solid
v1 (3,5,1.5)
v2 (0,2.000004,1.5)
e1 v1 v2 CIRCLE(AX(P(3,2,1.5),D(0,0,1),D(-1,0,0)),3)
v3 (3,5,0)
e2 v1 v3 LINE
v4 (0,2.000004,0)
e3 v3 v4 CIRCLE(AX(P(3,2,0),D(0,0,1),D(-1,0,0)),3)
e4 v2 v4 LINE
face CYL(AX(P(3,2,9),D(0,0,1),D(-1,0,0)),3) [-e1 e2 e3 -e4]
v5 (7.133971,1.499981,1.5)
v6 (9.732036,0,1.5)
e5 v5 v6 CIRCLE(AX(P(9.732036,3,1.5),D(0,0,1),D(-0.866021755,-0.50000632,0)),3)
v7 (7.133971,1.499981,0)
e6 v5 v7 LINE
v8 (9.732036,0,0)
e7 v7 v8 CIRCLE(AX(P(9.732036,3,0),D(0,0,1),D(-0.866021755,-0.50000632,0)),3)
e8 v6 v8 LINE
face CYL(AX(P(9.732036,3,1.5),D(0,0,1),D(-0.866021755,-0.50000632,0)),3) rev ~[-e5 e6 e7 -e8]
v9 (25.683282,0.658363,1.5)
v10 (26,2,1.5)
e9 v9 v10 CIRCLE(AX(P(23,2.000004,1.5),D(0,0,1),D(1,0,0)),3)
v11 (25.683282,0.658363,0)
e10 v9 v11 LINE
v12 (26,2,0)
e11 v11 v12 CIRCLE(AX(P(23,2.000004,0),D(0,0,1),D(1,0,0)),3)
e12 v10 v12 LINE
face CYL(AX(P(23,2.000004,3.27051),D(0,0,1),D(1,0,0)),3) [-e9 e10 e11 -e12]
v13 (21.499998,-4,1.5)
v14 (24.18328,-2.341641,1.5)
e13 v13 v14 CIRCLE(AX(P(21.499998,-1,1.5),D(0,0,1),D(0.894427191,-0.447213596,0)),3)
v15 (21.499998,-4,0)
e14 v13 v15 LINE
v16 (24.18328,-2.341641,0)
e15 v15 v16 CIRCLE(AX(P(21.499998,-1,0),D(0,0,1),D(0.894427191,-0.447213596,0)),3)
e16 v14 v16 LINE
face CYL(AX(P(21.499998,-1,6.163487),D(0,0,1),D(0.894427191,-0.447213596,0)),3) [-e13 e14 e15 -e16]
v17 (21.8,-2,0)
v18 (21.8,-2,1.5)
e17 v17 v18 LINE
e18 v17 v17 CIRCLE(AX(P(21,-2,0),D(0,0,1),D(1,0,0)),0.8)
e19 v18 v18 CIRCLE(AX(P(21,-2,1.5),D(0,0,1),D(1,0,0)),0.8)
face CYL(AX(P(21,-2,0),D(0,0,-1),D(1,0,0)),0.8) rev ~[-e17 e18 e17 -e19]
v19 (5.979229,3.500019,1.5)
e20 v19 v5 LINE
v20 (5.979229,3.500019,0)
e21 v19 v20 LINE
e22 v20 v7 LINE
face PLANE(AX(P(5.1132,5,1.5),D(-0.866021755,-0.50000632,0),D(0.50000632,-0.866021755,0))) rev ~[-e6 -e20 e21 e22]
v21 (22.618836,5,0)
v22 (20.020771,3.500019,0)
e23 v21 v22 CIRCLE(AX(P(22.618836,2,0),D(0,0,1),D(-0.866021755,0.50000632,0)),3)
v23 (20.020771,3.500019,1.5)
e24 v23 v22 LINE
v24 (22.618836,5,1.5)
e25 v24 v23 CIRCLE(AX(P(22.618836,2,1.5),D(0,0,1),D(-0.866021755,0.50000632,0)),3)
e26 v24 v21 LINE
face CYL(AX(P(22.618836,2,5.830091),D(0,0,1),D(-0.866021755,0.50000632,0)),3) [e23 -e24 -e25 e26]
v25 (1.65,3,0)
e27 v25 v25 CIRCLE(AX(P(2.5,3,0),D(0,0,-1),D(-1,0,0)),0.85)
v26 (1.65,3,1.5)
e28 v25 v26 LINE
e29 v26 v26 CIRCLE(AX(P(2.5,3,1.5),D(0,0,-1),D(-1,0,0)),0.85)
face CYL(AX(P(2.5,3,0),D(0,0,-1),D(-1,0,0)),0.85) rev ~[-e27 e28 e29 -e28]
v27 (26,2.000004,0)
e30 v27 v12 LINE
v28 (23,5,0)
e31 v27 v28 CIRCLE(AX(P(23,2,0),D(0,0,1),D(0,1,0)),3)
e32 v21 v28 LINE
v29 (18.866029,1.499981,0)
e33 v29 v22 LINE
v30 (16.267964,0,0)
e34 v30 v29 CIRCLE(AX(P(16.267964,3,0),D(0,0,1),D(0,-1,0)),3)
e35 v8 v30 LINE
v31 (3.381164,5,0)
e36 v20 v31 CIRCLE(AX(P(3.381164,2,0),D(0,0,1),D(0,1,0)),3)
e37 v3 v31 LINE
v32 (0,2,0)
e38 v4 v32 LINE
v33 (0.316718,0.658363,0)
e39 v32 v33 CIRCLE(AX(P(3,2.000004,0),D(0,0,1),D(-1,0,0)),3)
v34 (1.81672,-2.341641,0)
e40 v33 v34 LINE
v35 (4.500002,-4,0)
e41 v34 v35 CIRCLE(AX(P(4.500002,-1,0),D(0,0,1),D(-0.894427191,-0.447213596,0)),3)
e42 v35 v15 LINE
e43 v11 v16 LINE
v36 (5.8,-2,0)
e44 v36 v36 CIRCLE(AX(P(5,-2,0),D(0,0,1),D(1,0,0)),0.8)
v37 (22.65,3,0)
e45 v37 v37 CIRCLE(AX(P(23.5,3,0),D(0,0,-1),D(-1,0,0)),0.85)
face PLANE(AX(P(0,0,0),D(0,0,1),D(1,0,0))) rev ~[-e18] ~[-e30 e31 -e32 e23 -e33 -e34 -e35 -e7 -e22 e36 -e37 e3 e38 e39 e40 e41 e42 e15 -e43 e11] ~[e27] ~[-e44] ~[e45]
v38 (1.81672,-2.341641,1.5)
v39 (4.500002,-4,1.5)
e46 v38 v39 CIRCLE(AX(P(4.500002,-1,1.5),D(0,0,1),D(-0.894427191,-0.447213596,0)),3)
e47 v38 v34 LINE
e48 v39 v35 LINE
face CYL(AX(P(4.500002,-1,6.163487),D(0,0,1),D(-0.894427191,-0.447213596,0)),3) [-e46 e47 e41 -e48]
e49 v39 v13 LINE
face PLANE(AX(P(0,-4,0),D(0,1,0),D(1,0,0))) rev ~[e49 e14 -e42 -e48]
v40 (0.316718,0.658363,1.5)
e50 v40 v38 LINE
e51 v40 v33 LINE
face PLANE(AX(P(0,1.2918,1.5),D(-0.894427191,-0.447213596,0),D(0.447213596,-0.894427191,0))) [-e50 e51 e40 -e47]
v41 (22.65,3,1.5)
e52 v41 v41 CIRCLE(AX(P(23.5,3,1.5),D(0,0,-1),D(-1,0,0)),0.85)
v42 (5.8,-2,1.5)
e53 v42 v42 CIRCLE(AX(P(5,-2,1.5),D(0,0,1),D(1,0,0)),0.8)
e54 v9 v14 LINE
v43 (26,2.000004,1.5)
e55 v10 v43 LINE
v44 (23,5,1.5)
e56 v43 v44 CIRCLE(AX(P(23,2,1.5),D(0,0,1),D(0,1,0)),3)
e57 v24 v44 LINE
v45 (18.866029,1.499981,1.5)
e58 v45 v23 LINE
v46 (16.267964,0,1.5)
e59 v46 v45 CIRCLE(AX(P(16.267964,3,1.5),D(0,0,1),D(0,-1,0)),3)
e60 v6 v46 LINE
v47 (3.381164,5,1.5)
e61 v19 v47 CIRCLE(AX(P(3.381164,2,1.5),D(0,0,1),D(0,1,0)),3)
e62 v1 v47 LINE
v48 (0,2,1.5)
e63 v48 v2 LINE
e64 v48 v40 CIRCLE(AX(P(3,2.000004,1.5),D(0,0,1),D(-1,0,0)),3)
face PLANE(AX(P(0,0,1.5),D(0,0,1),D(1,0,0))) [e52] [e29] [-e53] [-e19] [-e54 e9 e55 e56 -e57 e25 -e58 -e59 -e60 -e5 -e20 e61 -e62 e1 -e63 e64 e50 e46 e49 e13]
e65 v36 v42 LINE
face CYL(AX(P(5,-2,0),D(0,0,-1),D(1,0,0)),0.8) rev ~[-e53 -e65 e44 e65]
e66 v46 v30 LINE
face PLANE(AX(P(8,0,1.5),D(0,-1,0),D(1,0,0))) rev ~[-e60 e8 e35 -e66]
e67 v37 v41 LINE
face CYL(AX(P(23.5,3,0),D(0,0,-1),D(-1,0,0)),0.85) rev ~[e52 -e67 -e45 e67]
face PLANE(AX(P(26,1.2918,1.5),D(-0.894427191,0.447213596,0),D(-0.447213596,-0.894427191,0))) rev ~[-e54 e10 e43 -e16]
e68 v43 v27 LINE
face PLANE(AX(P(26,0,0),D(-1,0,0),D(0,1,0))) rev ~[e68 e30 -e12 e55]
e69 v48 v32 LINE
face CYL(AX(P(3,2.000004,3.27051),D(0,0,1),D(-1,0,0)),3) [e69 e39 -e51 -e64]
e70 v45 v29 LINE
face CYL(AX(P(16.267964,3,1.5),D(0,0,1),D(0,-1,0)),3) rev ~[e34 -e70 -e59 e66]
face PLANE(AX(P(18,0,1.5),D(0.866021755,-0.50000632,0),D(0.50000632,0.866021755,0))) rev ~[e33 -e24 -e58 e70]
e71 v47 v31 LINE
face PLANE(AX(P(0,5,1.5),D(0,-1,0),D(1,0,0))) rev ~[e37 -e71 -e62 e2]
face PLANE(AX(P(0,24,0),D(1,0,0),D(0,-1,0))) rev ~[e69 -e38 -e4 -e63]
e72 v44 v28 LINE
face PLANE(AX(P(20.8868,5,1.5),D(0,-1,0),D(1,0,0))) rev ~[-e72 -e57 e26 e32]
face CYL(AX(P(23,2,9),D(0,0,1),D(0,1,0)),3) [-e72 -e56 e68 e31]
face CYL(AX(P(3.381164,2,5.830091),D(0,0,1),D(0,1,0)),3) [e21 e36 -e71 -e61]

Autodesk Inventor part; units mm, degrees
ref_plane "YZ Plane" through (0, 0, 0) normal (1, 0, 0) x (0, 1, 0)
ref_plane "XZ Plane" through (0, 0, 0) normal (0, 1, 0) x (-1, 0, 0)
ref_plane "XY Plane" through (0, 0, 0) normal (0, 0, 1) x (1, 0, 0)
sketch "スケッチ2" plane through (0, 0, 0) normal (0, 0, 1) x (1, 0, 0)
  line L0 (0, 0) -> (26, 0)
  line L1 (26, 0) -> (26, 33)
  line L2 (26, 33) -> (0, 33)
  line L3 (0, 33) -> (0, 0)
  line L4 (0, 0) -> (26, 0)
  line L5 (26, 0) -> (26, 24)
  line L6 (26, 24) -> (0, 24) construction
  line L7 (0, 24) -> (0, 0)
  circle A0 centre (13, 24) radius 13
  circle A1 centre (13, 24) radius 6.25
  line L8 (26, 0) -> (0, 0)
  line L9 (0, 0) -> (0, -4)
  line L10 (0, -4) -> (26, -4)
  line L11 (26, -4) -> (26, 0)
  circle A2 centre (21, -2) radius 0.8
  circle A3 centre (5, -2) radius 0.8
  point P0 (22.3808, 33)
  point P1 (3.6192, 33)
  point P2 (26, -2)
  dimension "d0" = 26
  dimension "d1" = 33
  dimension "d2" = 24
  dimension "d3" = 12.5
  dimension "d8" = 4
  dimension "d9" = 1.6
  dimension "d10" = 1.6
  dimension "d12" = 5
  dimension "d13" = 5
extrude "押し出し1" add sketch "スケッチ2" along normal blind 1.5 contours L3 A0 L1 L0 | L0 L11 L10 L9 | A0 L2 picked at (12.7489, 32.0681)
sketch "スケッチ3" plane through (0, 0, 0) normal (0, 0, -1) x (-1, 0, 0)
  circle A0 centre (-2.5, 24) radius 0.85 projected
  circle A1 centre (-23.5, 24) radius 0.85 projected
  circle A2 centre (-23.5, 3) radius 0.85 projected
  circle A3 centre (-2.5, 3) radius 0.85 projected
  point P0 (0, 0)
extrude "押し出し2" cut sketch "スケッチ3" against normal through all
fillet "フィレット1" radius 3 4 edges at (22.3808, 33, 0.75) (3.6192, 33, 0.75) (26, -4, 0.75) (0, -4, 0.75)
sketch "スケッチ4" plane through (0, 0, 1.5) normal (0, 0, 1) x (1, 0, 0)
  line L0 (0, 24) -> (0, -1) projected
  line L1 (0, 5) -> (26, 5)
  line L2 (26, 5) -> (26, 33)
  line L3 (26, 33) -> (0, 33)
  line L4 (0, 33) -> (0, 5)
  line L5 (21, 33) -> (5, 33) projected
  line L6 (26, -1) -> (26, 24) projected
  circle A0 centre (2.5, 3) radius 0.85 projected
  line L7 (5.1132, 5) -> (8, 0)
  line L8 (8, 0) -> (18, 0)
  line L9 (18, 0) -> (20.8868, 5)
  line L10 (0, 1.2918) -> (2.6459, -4)
  line L11 (3, -4) -> (23, -4) projected
  line L12 (26, 1.2918) -> (23.3541, -4)
  arc A1 (0, -1) -> (3, -4) centre (3, -1) ccw projected
  arc A2 (23, -4) -> (26, -1) centre (23, -1) ccw projected
  line L13 (2.5, 3) -> (5, -2)
  circle A3 centre (5, -2) radius 0.8 projected
  circle A4 centre (21, -2) radius 0.8 projected
  circle A5 centre (23.5, 3) radius 0.85 projected
  line L14 (23.5, 3) -> (21, -2)
  point P0 (0, 0)
  point P1 (13, 0)
  point P2 (13, 5)
  point P3 (23.3653, -3.9777)
  point P4 (2.6347, -3.9777)
  dimension "d15" = 2
  dimension "d16" = 10
  dimension "d17" = 5
  dimension "d18" = 120
  dimension "d19" = 120
  dimension "d24" = 3
  dimension "d25" = 3
extrude "切り取り1" cut sketch "スケッチ4" against normal blind 3.048 contours L4 L3 L2 L1 L0 | L1 L9 L8 L7
extrude "押し出し3" cut sketch "スケッチ4" against normal through all contours L10 A1 L0 | L6 A2 L12
fillet "フィレット3" radius 3 10 edges at (5.1132, 5, 0.75) (0, 5, 0.75) (8, 0, 0.75) (20.8868, 5, 0.75) (26, 5, 0.75) (26, 1.2918, 0.75) (18, 0, 0.75) (0, 1.2918, 0.75) (2.6347, -3.9777, 0.75) (23.3653, -3.9777, 0.75)
equation "\"d13\" = d12"
equation "\"d19\" = d18"
equation "\"d25\" = d24"
equation "\"d21\" = Thickness"
equation "\"BendRadius\" = Thickness"
equation "\"BendReliefWidth\" = Thickness"
equation "\"BendReliefDepth\" = 0.5 * Thickness"
equation "\"CornerReliefSize\" = 4 * Thickness"
equation "\"MinimumRemnant\" = 2 * Thickness"
equation "\"TransitionRadius\" = BendRadius"
equation "\"JacobiRadiusSize\" = BendRadius"
equation "\"GapSize\" = Thickness"
equation "\"d20\" = Thickness"
equation "\"Thickness\" = 3.048"
properties part number "upper_arm" material "アルミニウム 6061"
